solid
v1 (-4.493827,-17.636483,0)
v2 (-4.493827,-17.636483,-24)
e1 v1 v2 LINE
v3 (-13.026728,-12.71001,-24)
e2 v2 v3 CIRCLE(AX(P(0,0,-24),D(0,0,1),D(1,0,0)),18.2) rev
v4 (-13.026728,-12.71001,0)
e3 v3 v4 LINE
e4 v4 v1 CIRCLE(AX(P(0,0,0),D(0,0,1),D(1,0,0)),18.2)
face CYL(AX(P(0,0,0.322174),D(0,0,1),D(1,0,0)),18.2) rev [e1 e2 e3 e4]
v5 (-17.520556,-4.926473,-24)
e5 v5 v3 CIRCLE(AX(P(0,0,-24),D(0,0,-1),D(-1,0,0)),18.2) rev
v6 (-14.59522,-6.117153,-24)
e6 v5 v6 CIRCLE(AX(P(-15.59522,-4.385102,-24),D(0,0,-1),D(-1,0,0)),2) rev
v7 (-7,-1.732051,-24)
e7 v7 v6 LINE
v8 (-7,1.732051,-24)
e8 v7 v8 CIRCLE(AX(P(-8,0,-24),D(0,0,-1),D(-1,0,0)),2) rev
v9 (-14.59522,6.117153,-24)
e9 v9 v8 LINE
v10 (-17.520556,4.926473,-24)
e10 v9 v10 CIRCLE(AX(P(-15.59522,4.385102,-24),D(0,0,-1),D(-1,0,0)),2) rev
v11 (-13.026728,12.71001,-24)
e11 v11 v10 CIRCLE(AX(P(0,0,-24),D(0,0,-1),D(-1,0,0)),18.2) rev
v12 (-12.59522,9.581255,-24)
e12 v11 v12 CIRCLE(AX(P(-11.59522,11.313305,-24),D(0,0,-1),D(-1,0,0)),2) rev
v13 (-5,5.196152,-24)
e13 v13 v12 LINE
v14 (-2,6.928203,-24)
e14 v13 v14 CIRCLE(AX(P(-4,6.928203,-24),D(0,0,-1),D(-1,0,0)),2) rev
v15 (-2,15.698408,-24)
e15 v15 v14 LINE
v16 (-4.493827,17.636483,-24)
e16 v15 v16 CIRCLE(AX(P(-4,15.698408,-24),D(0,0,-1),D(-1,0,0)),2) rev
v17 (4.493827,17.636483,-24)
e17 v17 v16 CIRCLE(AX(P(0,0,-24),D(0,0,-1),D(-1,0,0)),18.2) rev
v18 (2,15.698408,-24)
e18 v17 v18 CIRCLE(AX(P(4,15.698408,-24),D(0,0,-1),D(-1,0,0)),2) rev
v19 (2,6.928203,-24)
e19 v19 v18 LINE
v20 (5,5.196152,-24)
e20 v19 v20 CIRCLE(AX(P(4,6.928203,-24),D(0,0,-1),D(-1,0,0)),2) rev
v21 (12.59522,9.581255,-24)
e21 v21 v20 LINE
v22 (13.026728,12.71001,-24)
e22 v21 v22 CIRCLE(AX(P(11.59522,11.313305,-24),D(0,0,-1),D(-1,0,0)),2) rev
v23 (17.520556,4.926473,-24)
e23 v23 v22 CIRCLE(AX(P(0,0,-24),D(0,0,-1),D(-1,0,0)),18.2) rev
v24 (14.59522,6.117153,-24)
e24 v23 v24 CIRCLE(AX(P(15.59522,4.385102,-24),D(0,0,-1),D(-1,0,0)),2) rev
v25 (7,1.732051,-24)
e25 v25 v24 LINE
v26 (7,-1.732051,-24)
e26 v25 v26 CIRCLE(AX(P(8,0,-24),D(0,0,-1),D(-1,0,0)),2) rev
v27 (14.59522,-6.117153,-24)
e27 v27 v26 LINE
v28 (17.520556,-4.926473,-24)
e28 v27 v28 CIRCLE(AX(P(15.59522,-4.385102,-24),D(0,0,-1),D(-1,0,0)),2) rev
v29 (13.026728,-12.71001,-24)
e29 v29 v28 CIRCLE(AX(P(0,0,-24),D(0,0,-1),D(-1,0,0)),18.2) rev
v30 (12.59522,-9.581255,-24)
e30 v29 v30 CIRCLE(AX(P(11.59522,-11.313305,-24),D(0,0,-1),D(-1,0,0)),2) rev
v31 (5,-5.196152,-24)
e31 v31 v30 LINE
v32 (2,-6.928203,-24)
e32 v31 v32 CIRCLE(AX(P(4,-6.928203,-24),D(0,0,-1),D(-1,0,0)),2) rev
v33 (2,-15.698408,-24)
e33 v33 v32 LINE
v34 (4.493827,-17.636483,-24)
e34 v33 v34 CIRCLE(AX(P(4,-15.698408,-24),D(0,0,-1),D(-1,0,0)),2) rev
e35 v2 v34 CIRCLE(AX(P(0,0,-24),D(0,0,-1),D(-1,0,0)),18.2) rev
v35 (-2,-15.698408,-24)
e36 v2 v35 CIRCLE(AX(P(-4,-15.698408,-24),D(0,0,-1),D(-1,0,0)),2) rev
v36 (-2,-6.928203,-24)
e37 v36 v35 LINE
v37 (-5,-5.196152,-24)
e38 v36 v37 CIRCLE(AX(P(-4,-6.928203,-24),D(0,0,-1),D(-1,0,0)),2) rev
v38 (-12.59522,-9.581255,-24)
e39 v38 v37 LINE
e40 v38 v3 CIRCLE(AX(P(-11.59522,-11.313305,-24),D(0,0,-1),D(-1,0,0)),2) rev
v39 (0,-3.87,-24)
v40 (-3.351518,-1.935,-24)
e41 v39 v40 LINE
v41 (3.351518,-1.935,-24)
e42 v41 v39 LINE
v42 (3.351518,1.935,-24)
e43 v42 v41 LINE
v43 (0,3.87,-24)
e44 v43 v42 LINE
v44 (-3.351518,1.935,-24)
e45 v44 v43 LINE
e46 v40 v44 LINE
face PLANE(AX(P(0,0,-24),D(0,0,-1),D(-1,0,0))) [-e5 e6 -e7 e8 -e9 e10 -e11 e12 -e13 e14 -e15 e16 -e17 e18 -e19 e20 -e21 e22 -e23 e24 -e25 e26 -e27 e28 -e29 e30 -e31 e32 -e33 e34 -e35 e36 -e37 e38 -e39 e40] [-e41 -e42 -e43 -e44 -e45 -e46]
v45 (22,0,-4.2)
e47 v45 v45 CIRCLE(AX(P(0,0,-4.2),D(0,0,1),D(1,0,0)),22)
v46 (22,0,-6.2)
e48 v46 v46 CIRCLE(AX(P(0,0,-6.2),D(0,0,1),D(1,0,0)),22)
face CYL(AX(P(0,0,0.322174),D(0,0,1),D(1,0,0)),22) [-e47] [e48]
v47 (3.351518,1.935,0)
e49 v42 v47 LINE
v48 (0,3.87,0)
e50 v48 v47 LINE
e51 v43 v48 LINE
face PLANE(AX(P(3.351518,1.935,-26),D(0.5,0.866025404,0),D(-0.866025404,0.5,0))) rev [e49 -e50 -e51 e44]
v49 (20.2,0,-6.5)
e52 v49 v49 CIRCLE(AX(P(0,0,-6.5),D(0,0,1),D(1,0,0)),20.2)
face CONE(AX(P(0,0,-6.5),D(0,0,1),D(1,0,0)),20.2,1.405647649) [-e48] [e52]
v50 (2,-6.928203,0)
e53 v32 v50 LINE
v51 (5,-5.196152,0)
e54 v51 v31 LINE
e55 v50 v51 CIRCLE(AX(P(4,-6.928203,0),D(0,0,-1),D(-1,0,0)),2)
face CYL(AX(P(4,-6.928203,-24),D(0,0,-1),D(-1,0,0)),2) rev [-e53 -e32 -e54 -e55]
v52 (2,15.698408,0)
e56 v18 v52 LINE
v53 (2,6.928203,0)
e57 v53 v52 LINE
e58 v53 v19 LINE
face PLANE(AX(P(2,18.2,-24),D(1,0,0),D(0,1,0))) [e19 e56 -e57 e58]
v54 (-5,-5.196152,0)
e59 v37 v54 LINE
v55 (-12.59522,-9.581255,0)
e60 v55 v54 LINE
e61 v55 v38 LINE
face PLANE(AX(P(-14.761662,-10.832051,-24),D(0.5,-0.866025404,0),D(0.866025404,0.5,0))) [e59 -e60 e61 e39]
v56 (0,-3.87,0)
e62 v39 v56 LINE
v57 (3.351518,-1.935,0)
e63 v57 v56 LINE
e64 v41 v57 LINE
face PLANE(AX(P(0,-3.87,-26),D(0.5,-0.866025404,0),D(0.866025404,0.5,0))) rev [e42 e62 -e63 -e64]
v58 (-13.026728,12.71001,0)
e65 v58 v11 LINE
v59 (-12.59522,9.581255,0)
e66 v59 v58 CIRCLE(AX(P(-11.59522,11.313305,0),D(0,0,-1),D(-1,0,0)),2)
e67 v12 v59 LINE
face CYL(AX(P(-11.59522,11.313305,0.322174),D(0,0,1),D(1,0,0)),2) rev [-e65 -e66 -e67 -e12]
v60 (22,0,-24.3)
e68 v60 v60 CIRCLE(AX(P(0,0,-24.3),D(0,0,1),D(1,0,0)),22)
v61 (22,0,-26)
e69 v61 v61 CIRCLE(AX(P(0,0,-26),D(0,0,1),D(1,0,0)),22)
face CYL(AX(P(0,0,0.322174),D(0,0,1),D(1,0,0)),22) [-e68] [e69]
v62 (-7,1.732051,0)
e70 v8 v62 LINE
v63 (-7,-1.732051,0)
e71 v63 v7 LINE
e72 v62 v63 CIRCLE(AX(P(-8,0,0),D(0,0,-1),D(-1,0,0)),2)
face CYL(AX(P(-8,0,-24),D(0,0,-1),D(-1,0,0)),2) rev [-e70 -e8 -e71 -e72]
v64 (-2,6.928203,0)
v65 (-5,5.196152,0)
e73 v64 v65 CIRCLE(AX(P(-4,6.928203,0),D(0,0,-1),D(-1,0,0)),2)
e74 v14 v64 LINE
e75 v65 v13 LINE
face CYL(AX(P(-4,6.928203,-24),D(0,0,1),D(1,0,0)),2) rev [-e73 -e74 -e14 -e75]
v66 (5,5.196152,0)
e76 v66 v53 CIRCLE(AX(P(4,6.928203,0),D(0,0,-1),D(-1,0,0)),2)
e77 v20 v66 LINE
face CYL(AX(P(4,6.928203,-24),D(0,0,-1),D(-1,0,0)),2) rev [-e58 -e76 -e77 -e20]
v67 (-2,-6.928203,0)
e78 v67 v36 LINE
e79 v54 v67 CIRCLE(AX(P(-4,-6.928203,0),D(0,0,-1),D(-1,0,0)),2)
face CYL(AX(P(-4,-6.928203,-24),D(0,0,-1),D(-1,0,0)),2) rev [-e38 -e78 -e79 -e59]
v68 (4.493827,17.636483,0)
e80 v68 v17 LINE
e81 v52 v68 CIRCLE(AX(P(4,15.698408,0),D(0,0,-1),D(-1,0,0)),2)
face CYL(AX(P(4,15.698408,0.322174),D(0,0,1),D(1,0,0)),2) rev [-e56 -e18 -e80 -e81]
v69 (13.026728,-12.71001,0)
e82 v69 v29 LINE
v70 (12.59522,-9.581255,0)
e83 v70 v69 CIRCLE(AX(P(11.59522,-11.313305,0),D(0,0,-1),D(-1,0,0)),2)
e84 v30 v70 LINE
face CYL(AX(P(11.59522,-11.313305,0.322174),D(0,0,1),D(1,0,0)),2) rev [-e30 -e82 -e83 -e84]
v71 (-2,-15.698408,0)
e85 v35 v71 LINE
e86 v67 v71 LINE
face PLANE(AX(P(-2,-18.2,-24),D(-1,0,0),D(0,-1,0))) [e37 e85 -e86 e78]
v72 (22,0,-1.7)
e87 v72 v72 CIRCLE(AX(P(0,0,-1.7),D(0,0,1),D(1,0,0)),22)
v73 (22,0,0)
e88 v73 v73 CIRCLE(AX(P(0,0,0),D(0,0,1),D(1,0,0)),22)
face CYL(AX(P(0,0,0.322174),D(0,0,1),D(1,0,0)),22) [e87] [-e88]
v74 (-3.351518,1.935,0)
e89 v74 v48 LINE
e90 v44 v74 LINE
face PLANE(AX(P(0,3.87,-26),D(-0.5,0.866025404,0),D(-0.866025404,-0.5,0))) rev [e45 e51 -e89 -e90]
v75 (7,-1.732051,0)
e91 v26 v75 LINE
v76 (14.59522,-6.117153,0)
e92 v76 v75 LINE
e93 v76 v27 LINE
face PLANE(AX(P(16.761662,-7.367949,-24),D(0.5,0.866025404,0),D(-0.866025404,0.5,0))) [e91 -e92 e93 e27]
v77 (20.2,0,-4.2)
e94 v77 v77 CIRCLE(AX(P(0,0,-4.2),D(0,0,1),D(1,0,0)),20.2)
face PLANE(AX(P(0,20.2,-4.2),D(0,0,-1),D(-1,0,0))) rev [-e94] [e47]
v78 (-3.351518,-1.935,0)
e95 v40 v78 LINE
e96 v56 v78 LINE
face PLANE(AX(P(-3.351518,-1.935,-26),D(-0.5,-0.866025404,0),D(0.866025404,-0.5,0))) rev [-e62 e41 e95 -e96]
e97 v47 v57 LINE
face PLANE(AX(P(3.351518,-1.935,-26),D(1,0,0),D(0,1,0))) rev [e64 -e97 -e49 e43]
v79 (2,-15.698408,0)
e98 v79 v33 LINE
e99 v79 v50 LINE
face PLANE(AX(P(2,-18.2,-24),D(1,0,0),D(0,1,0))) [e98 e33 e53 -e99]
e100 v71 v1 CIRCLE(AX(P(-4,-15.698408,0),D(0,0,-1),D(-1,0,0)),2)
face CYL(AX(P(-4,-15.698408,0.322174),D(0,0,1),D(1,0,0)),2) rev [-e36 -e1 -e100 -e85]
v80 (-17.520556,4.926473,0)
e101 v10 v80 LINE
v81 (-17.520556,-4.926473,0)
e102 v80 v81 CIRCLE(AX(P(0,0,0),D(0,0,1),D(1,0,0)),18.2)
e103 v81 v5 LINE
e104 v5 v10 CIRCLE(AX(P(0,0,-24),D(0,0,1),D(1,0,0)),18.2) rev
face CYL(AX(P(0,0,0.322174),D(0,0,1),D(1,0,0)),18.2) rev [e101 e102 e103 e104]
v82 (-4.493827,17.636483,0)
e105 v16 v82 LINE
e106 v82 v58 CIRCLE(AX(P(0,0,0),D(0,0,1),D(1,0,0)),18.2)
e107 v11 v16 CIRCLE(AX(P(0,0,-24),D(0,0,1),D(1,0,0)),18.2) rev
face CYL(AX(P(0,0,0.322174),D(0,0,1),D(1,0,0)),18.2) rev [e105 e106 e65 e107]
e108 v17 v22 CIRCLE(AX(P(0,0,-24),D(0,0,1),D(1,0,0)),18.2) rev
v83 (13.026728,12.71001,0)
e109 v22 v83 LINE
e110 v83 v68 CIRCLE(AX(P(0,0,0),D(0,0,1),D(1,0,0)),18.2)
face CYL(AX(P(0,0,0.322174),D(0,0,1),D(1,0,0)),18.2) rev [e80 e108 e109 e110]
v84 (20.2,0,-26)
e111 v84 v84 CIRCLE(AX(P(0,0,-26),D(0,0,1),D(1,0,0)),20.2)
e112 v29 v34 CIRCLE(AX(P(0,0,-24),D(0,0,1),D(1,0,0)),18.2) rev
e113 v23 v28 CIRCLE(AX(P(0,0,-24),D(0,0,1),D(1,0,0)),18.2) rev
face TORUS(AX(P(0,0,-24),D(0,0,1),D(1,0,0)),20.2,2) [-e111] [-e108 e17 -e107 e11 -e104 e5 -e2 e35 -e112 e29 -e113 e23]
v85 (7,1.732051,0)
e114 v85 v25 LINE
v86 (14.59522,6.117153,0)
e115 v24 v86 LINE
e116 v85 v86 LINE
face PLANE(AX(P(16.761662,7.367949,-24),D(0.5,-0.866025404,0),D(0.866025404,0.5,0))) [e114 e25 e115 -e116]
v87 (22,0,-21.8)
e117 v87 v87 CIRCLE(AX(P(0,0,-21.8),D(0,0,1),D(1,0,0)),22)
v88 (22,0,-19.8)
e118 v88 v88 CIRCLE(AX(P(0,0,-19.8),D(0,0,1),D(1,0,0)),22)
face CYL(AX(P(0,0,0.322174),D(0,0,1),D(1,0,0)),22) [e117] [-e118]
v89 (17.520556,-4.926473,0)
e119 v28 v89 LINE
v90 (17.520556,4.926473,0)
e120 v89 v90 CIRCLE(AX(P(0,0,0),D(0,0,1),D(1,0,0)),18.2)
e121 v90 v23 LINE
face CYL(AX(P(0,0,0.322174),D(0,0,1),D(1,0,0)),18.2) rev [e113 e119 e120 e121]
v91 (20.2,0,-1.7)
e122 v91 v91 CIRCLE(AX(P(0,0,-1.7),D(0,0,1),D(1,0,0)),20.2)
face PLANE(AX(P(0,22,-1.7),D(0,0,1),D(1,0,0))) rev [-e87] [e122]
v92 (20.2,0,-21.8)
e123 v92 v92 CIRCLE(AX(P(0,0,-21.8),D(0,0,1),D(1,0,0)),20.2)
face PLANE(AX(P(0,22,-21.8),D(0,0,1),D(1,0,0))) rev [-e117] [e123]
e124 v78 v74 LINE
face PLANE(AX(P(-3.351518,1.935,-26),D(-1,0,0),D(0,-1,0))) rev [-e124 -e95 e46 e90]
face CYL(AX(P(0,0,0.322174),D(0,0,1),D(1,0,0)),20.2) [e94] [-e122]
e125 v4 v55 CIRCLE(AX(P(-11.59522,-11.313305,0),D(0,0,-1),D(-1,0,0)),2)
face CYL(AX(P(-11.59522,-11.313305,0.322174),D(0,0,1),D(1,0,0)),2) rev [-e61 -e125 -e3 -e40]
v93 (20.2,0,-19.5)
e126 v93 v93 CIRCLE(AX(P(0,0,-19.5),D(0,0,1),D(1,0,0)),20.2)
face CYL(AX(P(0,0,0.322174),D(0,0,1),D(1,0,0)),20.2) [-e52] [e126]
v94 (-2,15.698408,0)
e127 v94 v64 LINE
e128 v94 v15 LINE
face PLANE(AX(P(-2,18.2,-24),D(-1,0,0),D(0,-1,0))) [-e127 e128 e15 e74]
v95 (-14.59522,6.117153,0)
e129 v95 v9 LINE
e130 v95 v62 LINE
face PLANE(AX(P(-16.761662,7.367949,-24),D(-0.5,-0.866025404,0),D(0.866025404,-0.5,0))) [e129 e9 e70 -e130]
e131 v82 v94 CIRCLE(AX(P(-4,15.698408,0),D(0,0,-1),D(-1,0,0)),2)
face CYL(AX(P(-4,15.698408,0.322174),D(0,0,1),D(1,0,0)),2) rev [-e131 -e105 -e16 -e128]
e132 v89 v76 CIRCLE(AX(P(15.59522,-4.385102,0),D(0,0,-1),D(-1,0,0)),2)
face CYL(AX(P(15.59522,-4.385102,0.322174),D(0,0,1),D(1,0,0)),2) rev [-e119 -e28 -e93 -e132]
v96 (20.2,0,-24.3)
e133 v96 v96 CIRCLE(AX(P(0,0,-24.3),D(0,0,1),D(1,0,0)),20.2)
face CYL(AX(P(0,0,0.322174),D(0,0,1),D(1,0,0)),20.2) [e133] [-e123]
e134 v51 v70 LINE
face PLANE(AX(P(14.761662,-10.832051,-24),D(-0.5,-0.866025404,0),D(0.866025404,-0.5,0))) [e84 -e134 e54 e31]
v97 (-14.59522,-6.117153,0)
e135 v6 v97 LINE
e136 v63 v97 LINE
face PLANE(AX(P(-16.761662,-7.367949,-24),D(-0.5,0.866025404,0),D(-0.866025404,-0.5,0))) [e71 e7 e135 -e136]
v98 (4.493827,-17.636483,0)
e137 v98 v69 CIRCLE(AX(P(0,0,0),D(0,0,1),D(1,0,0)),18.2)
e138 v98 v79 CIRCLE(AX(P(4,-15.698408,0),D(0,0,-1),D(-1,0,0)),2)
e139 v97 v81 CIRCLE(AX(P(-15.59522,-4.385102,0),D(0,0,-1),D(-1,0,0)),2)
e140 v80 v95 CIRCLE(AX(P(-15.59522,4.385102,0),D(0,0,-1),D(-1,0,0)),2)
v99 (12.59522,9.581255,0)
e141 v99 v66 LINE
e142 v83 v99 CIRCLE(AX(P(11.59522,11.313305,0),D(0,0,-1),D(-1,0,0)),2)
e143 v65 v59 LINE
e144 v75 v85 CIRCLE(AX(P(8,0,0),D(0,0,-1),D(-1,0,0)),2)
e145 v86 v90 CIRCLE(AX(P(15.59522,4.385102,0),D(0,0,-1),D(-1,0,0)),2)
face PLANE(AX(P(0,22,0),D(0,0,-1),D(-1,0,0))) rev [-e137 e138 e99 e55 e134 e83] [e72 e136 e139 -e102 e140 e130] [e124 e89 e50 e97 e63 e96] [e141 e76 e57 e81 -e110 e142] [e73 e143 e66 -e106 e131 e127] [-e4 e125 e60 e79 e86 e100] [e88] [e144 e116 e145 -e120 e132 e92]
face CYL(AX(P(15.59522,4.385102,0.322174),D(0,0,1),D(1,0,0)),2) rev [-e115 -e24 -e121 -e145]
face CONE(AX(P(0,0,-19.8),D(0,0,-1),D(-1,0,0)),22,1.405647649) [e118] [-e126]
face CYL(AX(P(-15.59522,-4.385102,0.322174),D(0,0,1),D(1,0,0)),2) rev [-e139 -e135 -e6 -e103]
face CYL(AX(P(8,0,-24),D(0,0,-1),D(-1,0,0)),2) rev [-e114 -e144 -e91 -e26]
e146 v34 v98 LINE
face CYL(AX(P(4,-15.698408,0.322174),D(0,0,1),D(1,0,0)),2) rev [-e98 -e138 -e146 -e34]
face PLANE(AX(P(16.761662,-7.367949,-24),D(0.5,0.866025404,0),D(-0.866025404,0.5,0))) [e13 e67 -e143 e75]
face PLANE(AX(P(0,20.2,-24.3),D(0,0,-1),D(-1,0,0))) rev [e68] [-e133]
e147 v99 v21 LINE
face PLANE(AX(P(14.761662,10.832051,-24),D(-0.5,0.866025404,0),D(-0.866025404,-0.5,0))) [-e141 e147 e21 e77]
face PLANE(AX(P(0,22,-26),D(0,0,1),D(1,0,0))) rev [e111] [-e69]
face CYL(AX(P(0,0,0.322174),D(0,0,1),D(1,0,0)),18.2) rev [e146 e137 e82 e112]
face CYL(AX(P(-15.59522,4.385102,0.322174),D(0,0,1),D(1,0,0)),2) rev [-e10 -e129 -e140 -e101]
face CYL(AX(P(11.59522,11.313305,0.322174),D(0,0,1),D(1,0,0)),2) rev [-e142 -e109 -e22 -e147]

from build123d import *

# Parameters (mm, degrees)
SKETCH2_W               = 4
SKETCH2_H               = 18.2
BOSS_EXTRUDE1_DEPTH     = 24
CIRPATTERN1_COUNT       = 6
CUT_EXTRUDE1_DEPTH      = 41.546269865
CUT_EXTRUDE1_DEPTH_BACK = 41.546269865
FILLET1_R               = 2
FILLET2_R               = 2


with BuildPart() as part:
    # Sketch1 → Revolve1 (revolve)
    with BuildSketch(Plane(origin=(0, 0, 0), x_dir=(0, 0, -1), z_dir=(1, 0, 0)), mode=Mode.PRIVATE) as revolve1_sk:
        Polygon((0, 22), (1.7, 22), (1.7, 20.2), (4.2, 20.2), (4.2, 22), (6.2, 22), (6.5, 20.2), (19.5, 20.2), (19.8, 22), (21.8, 22), (21.8, 20.2), (24.3, 20.2), (24.3, 22), (26, 22), (26, 18.2), (0, 18.2), align=None)
    revolve(revolve1_sk.sketch.rotate(Axis((0, 0, 0.322174052), (0, 0, -1)), 90), axis=Axis((0, 0, 0.322174052), (0, 0, -1)))

    # Sketch2 → Boss-Extrude1 (add)
    with BuildSketch(Plane.XY):
        with Locations((0, 9.1)):
            Rectangle(SKETCH2_W, SKETCH2_H)
    boss_extrude1 = extrude(amount=-BOSS_EXTRUDE1_DEPTH)

    # CirPattern1: Boss-Extrude1 ×6 about axis
    cirpattern1_axis = Axis((0, 0, 0), (0, 0, 1))
    for i in range(1, CIRPATTERN1_COUNT):
        add(boss_extrude1.rotate(cirpattern1_axis, i * 360 / CIRPATTERN1_COUNT))

    # Sketch3 → Cut-Extrude1 (cut, two sides: drawn at the far end of the back side and taken through both)
    with BuildSketch(Plane.XY.offset(-CUT_EXTRUDE1_DEPTH_BACK)):
        Polygon((0, -3.87), (3.351518313, -1.935), (3.351518313, 1.935), (0, 3.87), (-3.351518313, 1.935), (-3.351518313, -1.935), align=None)
    extrude(amount=CUT_EXTRUDE1_DEPTH + CUT_EXTRUDE1_DEPTH_BACK, mode=Mode.SUBTRACT)

    # Fillet1
    fillet1_edges = [part.edges().sort_by_distance(p)[0] for p in [
        (14.666205667, 10.776938867, -12),
        (-14.666205667, 10.776938867, -12),
        (-2, 18.089776118, -12),
        (2, 18.089776118, -12),
        (-16.666205667, 7.312837251, -12),
        (-14.666205667, -10.776938867, -12),
        (-16.666205667, -7.312837251, -12),
        (2, -18.089776118, -12),
        (-2, -18.089776118, -12),
        (14.666205667, -10.776938867, -12),
        (16.666205667, -7.312837251, -12),
        (16.666205667, 7.312837251, -12),
        (4, 0, -12),
        (2, -3.464101615, -12),
        (-2, -3.464101615, -12),
        (-4, 0, -12),
        (2, 3.464101615, -12),
        (-2, 3.464101615, -12),
    ]]
    fillet(fillet1_edges, radius=FILLET1_R)

    # Fillet2
    fillet2_edges = [part.edges().sort_by_distance(p)[0] for p in [
        (-18.2, 0, -26),
    ]]
    fillet(fillet2_edges, radius=FILLET2_R - 0.0001)  # a hair under: the kernel refuses the full size


solid = part.part
